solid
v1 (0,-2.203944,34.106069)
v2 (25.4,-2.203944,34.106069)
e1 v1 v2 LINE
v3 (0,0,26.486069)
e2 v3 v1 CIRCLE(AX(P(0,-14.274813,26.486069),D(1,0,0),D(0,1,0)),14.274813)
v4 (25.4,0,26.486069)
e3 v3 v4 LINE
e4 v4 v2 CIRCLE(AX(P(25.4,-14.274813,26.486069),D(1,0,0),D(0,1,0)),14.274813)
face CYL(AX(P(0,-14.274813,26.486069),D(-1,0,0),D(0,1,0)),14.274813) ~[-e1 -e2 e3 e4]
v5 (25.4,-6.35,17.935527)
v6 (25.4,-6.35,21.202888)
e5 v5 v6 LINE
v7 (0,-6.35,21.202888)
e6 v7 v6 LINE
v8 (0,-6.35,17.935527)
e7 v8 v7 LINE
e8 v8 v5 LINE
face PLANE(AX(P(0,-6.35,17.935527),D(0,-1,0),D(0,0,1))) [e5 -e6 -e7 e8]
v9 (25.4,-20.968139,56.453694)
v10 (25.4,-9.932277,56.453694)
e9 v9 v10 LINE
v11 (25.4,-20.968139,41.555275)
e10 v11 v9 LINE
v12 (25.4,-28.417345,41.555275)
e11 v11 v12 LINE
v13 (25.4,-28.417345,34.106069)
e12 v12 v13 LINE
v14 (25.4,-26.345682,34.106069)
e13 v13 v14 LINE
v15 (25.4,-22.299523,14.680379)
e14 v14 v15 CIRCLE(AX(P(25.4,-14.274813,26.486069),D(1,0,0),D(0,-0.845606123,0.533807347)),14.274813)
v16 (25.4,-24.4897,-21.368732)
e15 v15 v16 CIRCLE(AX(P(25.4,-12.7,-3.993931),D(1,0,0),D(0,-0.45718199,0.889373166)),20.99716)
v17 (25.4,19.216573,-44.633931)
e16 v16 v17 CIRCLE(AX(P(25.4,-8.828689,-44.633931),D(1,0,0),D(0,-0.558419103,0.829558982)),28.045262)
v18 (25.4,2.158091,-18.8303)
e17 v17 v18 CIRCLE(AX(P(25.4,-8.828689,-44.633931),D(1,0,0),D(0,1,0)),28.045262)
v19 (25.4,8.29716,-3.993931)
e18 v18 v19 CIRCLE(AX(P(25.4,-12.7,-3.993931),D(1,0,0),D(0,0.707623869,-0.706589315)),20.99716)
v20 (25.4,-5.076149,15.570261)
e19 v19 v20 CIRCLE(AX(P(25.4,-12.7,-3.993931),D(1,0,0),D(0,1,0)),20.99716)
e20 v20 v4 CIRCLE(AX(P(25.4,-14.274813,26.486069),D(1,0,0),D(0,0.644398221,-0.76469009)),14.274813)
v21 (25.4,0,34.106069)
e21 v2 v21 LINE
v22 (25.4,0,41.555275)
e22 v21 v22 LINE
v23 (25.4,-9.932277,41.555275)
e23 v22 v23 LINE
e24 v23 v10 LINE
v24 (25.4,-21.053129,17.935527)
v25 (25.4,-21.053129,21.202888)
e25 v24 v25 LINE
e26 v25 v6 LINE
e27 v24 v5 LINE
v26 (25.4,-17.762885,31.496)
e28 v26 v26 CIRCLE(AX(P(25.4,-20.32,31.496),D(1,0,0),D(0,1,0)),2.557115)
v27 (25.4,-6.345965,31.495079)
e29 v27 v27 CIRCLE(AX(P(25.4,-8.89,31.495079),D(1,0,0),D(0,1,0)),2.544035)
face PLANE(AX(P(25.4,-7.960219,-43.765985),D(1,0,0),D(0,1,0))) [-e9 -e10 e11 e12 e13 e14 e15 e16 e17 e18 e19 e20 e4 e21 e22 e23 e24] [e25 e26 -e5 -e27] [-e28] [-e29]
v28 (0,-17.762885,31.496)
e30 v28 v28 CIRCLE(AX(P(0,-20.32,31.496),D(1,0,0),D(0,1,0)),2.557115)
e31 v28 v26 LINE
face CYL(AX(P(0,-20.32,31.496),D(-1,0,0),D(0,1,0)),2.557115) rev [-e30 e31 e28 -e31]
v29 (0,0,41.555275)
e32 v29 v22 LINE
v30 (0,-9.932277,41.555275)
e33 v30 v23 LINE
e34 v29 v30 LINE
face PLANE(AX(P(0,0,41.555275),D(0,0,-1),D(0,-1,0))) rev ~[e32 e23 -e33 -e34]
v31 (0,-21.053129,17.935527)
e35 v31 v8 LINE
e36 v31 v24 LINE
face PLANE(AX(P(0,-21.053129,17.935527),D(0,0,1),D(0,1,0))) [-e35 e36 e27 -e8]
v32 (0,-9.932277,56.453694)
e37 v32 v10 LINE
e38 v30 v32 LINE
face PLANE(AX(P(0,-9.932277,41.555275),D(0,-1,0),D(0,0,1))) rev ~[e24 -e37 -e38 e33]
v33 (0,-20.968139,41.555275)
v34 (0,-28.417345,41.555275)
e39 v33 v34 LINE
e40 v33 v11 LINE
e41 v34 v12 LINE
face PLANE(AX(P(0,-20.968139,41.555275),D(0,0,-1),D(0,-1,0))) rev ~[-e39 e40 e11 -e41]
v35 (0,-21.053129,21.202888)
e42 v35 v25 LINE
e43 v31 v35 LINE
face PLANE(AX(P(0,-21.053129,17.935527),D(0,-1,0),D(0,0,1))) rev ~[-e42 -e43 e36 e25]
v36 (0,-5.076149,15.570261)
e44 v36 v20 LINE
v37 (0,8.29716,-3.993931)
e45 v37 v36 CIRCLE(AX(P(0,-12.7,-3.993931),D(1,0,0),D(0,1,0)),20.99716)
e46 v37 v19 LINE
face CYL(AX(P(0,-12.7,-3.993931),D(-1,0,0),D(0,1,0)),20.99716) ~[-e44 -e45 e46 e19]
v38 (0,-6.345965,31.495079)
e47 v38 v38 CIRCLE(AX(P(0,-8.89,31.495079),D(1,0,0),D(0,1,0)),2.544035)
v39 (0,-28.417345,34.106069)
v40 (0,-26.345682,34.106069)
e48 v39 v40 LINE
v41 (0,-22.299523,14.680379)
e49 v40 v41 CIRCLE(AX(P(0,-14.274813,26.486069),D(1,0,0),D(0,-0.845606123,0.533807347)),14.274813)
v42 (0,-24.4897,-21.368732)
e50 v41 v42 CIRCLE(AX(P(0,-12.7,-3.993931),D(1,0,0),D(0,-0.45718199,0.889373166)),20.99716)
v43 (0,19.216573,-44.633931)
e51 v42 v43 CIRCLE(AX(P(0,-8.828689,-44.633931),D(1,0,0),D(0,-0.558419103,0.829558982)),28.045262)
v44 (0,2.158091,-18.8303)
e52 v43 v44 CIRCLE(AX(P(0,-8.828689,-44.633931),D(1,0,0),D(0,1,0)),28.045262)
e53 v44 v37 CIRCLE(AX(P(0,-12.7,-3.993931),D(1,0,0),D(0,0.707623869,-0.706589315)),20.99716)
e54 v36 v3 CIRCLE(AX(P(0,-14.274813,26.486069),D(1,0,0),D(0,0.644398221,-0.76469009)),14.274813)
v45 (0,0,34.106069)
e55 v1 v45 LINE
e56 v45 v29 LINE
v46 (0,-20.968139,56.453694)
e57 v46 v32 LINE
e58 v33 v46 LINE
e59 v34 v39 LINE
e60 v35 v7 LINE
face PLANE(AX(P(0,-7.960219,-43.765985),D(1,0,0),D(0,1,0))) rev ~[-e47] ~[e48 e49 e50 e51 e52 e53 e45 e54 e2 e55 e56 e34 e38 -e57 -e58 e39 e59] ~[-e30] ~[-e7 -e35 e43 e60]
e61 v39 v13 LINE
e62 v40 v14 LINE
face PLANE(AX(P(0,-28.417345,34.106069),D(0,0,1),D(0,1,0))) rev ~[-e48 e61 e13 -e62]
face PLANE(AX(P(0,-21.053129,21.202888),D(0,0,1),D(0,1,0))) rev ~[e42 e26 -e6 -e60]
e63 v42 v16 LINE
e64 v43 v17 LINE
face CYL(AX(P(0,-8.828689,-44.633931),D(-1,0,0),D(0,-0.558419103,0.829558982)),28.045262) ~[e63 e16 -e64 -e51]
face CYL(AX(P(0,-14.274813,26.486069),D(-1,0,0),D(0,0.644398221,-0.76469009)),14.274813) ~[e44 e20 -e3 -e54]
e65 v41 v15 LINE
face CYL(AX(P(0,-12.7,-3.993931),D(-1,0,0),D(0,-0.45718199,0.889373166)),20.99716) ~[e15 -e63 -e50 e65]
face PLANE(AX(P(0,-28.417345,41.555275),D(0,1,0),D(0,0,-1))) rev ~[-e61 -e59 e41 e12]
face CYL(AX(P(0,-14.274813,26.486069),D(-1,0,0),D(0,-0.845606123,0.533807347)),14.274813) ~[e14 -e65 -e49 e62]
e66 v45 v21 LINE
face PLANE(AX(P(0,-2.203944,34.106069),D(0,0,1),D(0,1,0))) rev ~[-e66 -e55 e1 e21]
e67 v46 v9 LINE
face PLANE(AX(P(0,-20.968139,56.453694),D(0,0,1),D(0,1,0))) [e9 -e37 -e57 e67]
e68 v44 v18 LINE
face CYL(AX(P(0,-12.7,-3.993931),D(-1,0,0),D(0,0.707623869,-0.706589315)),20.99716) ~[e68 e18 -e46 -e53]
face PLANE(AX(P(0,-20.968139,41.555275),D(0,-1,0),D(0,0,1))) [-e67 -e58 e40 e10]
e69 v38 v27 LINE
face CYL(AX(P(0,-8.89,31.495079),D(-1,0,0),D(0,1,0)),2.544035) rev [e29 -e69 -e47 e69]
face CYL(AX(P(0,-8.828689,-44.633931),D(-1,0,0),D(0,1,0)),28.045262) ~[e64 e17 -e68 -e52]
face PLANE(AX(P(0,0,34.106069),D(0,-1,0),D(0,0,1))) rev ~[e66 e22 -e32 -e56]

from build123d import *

# Parameters (mm, degrees)
F0_W     = 11.0358623788
F0_H     = 14.8984193802
F1_DEPTH = 25.4
F2_DEPTH = 25.4
F3_R     = 2.5571153932
F3_R_2   = 2.5440351013
F3_W     = 14.7031287464
F3_H     = 3.2673614761
F4_DEPTH = 25.4


# Not quite as in the source:
# - the program builds the solid bodies; features that only make, move or delete a surface that nothing else refers to are left out


with BuildPart() as f1:
    # F0 (on Right) → F1 (new body)
    with BuildSketch(Plane.YZ):
        with BuildLine():
            ThreePointArc((-24.4896995825, -21.3687317689), (-22.0066937129, -69.3902825337), (19.2165729762, -44.633931036))
            ThreePointArc((19.2165729762, -44.633931036), (14.5664371428, -29.167684068), (2.1580914014, -18.8302997515))
            ThreePointArc((2.1580914014, -18.8302997515), (-10.7088530026, -24.8964679727), (-24.4896995825, -21.3687317689))
        make_face()
        with BuildLine():
            ThreePointArc((-24.4896995825, -21.3687317689), (-10.7088530026, -24.8964679727), (2.1580914014, -18.8302997515))
            ThreePointArc((2.1580914014, -18.8302997515), (-11.4882033251, -16.7150534797), (-24.4896995825, -21.3687317689))
        make_face()
        with BuildLine():
            ThreePointArc((-24.4896995825, -21.3687317689), (-11.4882033251, -16.7150534797), (2.1580914014, -18.8302997515))
            ThreePointArc((2.1580914014, -18.8302997515), (6.7017838768, -12.0221001394), (8.2971597307, -3.993931036))
            ThreePointArc((8.2971597307, -3.993931036), (4.6343580327, 7.8551511373), (-5.0761488644, 15.5702610153))
            ThreePointArc((-5.0761488644, 15.5702610153), (-13.5382573111, 12.2302712352), (-22.2995232661, 14.6803793882))
            ThreePointArc((-22.2995232661, 14.6803793882), (-33.6585141964, -2.7205891991), (-24.4896995825, -21.3687317689))
        make_face()
        with BuildLine():
            ThreePointArc((-26.3456820786, 34.106068964), (-28.2496986989, 23.5752529976), (-22.2995232661, 14.6803793882))
            ThreePointArc((-22.2995232661, 14.6803793882), (-13.7834170108, 16.9752588467), (-5.0761488644, 15.5702610153))
            ThreePointArc((-5.0761488644, 15.5702610153), (-1.3310983759, 20.4668881546), (0, 26.486068964))
            ThreePointArc((0, 26.486068964), (-0.5620509112, 30.4522310833), (-2.2039436985, 34.106068964))
            Line((-2.2039436985, 34.106068964), (-26.3456820786, 34.106068964))
        make_face()
        with BuildLine():
            ThreePointArc((-5.0761488644, 15.5702610153), (-13.7834170108, 16.9752588467), (-22.2995232661, 14.6803793882))
            ThreePointArc((-22.2995232661, 14.6803793882), (-13.5382573111, 12.2302712352), (-5.0761488644, 15.5702610153))
        make_face()
        with BuildLine():
            Line((-28.4173451364, 34.106068964), (-26.3456820786, 34.106068964))
            ThreePointArc((-26.3456820786, 34.106068964), (-14.2748128886, 40.7608818526), (-2.2039436985, 34.106068964))
            Line((-2.2039436985, 34.106068964), (0, 34.106068964))
            Line((0, 34.106068964), (0, 41.5552749288))
            Line((0, 41.5552749288), (-9.9322767928, 41.5552749288))
            Line((-9.9322767928, 41.5552749288), (-20.9681391716, 41.5552749288))
            Line((-20.9681391716, 41.5552749288), (-28.4173451364, 41.5552749288))
            Line((-28.4173451364, 41.5552749288), (-28.4173451364, 34.106068964))
        make_face()
        with BuildLine():
            ThreePointArc((-2.2039436985, 34.106068964), (-14.2748128886, 40.7608818526), (-26.3456820786, 34.106068964))
            Line((-26.3456820786, 34.106068964), (-2.2039436985, 34.106068964))
        make_face()
        with Locations((-15.4502079822, 49.0044846189)):
            Rectangle(F0_W, F0_H)
    extrude(amount=F1_DEPTH)

    # F0 (on Right) → F2 (join)
    with BuildSketch(Plane.YZ):
        with BuildLine():
            ThreePointArc((-24.4896995825, -21.3687317689), (-22.0066937129, -69.3902825337), (19.2165729762, -44.633931036))
            ThreePointArc((19.2165729762, -44.633931036), (14.5664371428, -29.167684068), (2.1580914014, -18.8302997515))
            ThreePointArc((2.1580914014, -18.8302997515), (-10.7088530026, -24.8964679727), (-24.4896995825, -21.3687317689))
        make_face()
        with BuildLine():
            ThreePointArc((-24.4896995825, -21.3687317689), (-10.7088530026, -24.8964679727), (2.1580914014, -18.8302997515))
            ThreePointArc((2.1580914014, -18.8302997515), (-11.4882033251, -16.7150534797), (-24.4896995825, -21.3687317689))
        make_face()
        with BuildLine():
            ThreePointArc((-24.4896995825, -21.3687317689), (-11.4882033251, -16.7150534797), (2.1580914014, -18.8302997515))
            ThreePointArc((2.1580914014, -18.8302997515), (6.7017838768, -12.0221001394), (8.2971597307, -3.993931036))
            ThreePointArc((8.2971597307, -3.993931036), (4.6343580327, 7.8551511373), (-5.0761488644, 15.5702610153))
            ThreePointArc((-5.0761488644, 15.5702610153), (-13.5382573111, 12.2302712352), (-22.2995232661, 14.6803793882))
            ThreePointArc((-22.2995232661, 14.6803793882), (-33.6585141964, -2.7205891991), (-24.4896995825, -21.3687317689))
        make_face()
        with BuildLine():
            ThreePointArc((-26.3456820786, 34.106068964), (-28.2496986989, 23.5752529976), (-22.2995232661, 14.6803793882))
            ThreePointArc((-22.2995232661, 14.6803793882), (-13.7834170108, 16.9752588467), (-5.0761488644, 15.5702610153))
            ThreePointArc((-5.0761488644, 15.5702610153), (-1.3310983759, 20.4668881546), (0, 26.486068964))
            ThreePointArc((0, 26.486068964), (-0.5620509112, 30.4522310833), (-2.2039436985, 34.106068964))
            Line((-2.2039436985, 34.106068964), (-26.3456820786, 34.106068964))
        make_face()
        with BuildLine():
            ThreePointArc((-5.0761488644, 15.5702610153), (-13.7834170108, 16.9752588467), (-22.2995232661, 14.6803793882))
            ThreePointArc((-22.2995232661, 14.6803793882), (-13.5382573111, 12.2302712352), (-5.0761488644, 15.5702610153))
        make_face()
        with BuildLine():
            Line((-28.4173451364, 34.106068964), (-26.3456820786, 34.106068964))
            ThreePointArc((-26.3456820786, 34.106068964), (-14.2748128886, 40.7608818526), (-2.2039436985, 34.106068964))
            Line((-2.2039436985, 34.106068964), (0, 34.106068964))
            Line((0, 34.106068964), (0, 41.5552749288))
            Line((0, 41.5552749288), (-9.9322767928, 41.5552749288))
            Line((-9.9322767928, 41.5552749288), (-20.9681391716, 41.5552749288))
            Line((-20.9681391716, 41.5552749288), (-28.4173451364, 41.5552749288))
            Line((-28.4173451364, 41.5552749288), (-28.4173451364, 34.106068964))
        make_face()
        with BuildLine():
            ThreePointArc((-2.2039436985, 34.106068964), (-14.2748128886, 40.7608818526), (-26.3456820786, 34.106068964))
            Line((-26.3456820786, 34.106068964), (-2.2039436985, 34.106068964))
        make_face()
        with Locations((-15.4502079822, 49.0044846189)):
            Rectangle(F0_W, F0_H)
    extrude(amount=F2_DEPTH)

    # F3 (on Right) → F4 (cut)
    with BuildSketch(Plane.YZ):
        with Locations((-20.32, 31.496)):
            Circle(F3_R)
        with Locations((-8.89, 31.4950787105)):
            Circle(F3_R_2)
        with Locations((-13.7015643732, 19.5692073871)):
            Rectangle(F3_W, F3_H)
    extrude(amount=F4_DEPTH, mode=Mode.SUBTRACT)


solid = f1.part
